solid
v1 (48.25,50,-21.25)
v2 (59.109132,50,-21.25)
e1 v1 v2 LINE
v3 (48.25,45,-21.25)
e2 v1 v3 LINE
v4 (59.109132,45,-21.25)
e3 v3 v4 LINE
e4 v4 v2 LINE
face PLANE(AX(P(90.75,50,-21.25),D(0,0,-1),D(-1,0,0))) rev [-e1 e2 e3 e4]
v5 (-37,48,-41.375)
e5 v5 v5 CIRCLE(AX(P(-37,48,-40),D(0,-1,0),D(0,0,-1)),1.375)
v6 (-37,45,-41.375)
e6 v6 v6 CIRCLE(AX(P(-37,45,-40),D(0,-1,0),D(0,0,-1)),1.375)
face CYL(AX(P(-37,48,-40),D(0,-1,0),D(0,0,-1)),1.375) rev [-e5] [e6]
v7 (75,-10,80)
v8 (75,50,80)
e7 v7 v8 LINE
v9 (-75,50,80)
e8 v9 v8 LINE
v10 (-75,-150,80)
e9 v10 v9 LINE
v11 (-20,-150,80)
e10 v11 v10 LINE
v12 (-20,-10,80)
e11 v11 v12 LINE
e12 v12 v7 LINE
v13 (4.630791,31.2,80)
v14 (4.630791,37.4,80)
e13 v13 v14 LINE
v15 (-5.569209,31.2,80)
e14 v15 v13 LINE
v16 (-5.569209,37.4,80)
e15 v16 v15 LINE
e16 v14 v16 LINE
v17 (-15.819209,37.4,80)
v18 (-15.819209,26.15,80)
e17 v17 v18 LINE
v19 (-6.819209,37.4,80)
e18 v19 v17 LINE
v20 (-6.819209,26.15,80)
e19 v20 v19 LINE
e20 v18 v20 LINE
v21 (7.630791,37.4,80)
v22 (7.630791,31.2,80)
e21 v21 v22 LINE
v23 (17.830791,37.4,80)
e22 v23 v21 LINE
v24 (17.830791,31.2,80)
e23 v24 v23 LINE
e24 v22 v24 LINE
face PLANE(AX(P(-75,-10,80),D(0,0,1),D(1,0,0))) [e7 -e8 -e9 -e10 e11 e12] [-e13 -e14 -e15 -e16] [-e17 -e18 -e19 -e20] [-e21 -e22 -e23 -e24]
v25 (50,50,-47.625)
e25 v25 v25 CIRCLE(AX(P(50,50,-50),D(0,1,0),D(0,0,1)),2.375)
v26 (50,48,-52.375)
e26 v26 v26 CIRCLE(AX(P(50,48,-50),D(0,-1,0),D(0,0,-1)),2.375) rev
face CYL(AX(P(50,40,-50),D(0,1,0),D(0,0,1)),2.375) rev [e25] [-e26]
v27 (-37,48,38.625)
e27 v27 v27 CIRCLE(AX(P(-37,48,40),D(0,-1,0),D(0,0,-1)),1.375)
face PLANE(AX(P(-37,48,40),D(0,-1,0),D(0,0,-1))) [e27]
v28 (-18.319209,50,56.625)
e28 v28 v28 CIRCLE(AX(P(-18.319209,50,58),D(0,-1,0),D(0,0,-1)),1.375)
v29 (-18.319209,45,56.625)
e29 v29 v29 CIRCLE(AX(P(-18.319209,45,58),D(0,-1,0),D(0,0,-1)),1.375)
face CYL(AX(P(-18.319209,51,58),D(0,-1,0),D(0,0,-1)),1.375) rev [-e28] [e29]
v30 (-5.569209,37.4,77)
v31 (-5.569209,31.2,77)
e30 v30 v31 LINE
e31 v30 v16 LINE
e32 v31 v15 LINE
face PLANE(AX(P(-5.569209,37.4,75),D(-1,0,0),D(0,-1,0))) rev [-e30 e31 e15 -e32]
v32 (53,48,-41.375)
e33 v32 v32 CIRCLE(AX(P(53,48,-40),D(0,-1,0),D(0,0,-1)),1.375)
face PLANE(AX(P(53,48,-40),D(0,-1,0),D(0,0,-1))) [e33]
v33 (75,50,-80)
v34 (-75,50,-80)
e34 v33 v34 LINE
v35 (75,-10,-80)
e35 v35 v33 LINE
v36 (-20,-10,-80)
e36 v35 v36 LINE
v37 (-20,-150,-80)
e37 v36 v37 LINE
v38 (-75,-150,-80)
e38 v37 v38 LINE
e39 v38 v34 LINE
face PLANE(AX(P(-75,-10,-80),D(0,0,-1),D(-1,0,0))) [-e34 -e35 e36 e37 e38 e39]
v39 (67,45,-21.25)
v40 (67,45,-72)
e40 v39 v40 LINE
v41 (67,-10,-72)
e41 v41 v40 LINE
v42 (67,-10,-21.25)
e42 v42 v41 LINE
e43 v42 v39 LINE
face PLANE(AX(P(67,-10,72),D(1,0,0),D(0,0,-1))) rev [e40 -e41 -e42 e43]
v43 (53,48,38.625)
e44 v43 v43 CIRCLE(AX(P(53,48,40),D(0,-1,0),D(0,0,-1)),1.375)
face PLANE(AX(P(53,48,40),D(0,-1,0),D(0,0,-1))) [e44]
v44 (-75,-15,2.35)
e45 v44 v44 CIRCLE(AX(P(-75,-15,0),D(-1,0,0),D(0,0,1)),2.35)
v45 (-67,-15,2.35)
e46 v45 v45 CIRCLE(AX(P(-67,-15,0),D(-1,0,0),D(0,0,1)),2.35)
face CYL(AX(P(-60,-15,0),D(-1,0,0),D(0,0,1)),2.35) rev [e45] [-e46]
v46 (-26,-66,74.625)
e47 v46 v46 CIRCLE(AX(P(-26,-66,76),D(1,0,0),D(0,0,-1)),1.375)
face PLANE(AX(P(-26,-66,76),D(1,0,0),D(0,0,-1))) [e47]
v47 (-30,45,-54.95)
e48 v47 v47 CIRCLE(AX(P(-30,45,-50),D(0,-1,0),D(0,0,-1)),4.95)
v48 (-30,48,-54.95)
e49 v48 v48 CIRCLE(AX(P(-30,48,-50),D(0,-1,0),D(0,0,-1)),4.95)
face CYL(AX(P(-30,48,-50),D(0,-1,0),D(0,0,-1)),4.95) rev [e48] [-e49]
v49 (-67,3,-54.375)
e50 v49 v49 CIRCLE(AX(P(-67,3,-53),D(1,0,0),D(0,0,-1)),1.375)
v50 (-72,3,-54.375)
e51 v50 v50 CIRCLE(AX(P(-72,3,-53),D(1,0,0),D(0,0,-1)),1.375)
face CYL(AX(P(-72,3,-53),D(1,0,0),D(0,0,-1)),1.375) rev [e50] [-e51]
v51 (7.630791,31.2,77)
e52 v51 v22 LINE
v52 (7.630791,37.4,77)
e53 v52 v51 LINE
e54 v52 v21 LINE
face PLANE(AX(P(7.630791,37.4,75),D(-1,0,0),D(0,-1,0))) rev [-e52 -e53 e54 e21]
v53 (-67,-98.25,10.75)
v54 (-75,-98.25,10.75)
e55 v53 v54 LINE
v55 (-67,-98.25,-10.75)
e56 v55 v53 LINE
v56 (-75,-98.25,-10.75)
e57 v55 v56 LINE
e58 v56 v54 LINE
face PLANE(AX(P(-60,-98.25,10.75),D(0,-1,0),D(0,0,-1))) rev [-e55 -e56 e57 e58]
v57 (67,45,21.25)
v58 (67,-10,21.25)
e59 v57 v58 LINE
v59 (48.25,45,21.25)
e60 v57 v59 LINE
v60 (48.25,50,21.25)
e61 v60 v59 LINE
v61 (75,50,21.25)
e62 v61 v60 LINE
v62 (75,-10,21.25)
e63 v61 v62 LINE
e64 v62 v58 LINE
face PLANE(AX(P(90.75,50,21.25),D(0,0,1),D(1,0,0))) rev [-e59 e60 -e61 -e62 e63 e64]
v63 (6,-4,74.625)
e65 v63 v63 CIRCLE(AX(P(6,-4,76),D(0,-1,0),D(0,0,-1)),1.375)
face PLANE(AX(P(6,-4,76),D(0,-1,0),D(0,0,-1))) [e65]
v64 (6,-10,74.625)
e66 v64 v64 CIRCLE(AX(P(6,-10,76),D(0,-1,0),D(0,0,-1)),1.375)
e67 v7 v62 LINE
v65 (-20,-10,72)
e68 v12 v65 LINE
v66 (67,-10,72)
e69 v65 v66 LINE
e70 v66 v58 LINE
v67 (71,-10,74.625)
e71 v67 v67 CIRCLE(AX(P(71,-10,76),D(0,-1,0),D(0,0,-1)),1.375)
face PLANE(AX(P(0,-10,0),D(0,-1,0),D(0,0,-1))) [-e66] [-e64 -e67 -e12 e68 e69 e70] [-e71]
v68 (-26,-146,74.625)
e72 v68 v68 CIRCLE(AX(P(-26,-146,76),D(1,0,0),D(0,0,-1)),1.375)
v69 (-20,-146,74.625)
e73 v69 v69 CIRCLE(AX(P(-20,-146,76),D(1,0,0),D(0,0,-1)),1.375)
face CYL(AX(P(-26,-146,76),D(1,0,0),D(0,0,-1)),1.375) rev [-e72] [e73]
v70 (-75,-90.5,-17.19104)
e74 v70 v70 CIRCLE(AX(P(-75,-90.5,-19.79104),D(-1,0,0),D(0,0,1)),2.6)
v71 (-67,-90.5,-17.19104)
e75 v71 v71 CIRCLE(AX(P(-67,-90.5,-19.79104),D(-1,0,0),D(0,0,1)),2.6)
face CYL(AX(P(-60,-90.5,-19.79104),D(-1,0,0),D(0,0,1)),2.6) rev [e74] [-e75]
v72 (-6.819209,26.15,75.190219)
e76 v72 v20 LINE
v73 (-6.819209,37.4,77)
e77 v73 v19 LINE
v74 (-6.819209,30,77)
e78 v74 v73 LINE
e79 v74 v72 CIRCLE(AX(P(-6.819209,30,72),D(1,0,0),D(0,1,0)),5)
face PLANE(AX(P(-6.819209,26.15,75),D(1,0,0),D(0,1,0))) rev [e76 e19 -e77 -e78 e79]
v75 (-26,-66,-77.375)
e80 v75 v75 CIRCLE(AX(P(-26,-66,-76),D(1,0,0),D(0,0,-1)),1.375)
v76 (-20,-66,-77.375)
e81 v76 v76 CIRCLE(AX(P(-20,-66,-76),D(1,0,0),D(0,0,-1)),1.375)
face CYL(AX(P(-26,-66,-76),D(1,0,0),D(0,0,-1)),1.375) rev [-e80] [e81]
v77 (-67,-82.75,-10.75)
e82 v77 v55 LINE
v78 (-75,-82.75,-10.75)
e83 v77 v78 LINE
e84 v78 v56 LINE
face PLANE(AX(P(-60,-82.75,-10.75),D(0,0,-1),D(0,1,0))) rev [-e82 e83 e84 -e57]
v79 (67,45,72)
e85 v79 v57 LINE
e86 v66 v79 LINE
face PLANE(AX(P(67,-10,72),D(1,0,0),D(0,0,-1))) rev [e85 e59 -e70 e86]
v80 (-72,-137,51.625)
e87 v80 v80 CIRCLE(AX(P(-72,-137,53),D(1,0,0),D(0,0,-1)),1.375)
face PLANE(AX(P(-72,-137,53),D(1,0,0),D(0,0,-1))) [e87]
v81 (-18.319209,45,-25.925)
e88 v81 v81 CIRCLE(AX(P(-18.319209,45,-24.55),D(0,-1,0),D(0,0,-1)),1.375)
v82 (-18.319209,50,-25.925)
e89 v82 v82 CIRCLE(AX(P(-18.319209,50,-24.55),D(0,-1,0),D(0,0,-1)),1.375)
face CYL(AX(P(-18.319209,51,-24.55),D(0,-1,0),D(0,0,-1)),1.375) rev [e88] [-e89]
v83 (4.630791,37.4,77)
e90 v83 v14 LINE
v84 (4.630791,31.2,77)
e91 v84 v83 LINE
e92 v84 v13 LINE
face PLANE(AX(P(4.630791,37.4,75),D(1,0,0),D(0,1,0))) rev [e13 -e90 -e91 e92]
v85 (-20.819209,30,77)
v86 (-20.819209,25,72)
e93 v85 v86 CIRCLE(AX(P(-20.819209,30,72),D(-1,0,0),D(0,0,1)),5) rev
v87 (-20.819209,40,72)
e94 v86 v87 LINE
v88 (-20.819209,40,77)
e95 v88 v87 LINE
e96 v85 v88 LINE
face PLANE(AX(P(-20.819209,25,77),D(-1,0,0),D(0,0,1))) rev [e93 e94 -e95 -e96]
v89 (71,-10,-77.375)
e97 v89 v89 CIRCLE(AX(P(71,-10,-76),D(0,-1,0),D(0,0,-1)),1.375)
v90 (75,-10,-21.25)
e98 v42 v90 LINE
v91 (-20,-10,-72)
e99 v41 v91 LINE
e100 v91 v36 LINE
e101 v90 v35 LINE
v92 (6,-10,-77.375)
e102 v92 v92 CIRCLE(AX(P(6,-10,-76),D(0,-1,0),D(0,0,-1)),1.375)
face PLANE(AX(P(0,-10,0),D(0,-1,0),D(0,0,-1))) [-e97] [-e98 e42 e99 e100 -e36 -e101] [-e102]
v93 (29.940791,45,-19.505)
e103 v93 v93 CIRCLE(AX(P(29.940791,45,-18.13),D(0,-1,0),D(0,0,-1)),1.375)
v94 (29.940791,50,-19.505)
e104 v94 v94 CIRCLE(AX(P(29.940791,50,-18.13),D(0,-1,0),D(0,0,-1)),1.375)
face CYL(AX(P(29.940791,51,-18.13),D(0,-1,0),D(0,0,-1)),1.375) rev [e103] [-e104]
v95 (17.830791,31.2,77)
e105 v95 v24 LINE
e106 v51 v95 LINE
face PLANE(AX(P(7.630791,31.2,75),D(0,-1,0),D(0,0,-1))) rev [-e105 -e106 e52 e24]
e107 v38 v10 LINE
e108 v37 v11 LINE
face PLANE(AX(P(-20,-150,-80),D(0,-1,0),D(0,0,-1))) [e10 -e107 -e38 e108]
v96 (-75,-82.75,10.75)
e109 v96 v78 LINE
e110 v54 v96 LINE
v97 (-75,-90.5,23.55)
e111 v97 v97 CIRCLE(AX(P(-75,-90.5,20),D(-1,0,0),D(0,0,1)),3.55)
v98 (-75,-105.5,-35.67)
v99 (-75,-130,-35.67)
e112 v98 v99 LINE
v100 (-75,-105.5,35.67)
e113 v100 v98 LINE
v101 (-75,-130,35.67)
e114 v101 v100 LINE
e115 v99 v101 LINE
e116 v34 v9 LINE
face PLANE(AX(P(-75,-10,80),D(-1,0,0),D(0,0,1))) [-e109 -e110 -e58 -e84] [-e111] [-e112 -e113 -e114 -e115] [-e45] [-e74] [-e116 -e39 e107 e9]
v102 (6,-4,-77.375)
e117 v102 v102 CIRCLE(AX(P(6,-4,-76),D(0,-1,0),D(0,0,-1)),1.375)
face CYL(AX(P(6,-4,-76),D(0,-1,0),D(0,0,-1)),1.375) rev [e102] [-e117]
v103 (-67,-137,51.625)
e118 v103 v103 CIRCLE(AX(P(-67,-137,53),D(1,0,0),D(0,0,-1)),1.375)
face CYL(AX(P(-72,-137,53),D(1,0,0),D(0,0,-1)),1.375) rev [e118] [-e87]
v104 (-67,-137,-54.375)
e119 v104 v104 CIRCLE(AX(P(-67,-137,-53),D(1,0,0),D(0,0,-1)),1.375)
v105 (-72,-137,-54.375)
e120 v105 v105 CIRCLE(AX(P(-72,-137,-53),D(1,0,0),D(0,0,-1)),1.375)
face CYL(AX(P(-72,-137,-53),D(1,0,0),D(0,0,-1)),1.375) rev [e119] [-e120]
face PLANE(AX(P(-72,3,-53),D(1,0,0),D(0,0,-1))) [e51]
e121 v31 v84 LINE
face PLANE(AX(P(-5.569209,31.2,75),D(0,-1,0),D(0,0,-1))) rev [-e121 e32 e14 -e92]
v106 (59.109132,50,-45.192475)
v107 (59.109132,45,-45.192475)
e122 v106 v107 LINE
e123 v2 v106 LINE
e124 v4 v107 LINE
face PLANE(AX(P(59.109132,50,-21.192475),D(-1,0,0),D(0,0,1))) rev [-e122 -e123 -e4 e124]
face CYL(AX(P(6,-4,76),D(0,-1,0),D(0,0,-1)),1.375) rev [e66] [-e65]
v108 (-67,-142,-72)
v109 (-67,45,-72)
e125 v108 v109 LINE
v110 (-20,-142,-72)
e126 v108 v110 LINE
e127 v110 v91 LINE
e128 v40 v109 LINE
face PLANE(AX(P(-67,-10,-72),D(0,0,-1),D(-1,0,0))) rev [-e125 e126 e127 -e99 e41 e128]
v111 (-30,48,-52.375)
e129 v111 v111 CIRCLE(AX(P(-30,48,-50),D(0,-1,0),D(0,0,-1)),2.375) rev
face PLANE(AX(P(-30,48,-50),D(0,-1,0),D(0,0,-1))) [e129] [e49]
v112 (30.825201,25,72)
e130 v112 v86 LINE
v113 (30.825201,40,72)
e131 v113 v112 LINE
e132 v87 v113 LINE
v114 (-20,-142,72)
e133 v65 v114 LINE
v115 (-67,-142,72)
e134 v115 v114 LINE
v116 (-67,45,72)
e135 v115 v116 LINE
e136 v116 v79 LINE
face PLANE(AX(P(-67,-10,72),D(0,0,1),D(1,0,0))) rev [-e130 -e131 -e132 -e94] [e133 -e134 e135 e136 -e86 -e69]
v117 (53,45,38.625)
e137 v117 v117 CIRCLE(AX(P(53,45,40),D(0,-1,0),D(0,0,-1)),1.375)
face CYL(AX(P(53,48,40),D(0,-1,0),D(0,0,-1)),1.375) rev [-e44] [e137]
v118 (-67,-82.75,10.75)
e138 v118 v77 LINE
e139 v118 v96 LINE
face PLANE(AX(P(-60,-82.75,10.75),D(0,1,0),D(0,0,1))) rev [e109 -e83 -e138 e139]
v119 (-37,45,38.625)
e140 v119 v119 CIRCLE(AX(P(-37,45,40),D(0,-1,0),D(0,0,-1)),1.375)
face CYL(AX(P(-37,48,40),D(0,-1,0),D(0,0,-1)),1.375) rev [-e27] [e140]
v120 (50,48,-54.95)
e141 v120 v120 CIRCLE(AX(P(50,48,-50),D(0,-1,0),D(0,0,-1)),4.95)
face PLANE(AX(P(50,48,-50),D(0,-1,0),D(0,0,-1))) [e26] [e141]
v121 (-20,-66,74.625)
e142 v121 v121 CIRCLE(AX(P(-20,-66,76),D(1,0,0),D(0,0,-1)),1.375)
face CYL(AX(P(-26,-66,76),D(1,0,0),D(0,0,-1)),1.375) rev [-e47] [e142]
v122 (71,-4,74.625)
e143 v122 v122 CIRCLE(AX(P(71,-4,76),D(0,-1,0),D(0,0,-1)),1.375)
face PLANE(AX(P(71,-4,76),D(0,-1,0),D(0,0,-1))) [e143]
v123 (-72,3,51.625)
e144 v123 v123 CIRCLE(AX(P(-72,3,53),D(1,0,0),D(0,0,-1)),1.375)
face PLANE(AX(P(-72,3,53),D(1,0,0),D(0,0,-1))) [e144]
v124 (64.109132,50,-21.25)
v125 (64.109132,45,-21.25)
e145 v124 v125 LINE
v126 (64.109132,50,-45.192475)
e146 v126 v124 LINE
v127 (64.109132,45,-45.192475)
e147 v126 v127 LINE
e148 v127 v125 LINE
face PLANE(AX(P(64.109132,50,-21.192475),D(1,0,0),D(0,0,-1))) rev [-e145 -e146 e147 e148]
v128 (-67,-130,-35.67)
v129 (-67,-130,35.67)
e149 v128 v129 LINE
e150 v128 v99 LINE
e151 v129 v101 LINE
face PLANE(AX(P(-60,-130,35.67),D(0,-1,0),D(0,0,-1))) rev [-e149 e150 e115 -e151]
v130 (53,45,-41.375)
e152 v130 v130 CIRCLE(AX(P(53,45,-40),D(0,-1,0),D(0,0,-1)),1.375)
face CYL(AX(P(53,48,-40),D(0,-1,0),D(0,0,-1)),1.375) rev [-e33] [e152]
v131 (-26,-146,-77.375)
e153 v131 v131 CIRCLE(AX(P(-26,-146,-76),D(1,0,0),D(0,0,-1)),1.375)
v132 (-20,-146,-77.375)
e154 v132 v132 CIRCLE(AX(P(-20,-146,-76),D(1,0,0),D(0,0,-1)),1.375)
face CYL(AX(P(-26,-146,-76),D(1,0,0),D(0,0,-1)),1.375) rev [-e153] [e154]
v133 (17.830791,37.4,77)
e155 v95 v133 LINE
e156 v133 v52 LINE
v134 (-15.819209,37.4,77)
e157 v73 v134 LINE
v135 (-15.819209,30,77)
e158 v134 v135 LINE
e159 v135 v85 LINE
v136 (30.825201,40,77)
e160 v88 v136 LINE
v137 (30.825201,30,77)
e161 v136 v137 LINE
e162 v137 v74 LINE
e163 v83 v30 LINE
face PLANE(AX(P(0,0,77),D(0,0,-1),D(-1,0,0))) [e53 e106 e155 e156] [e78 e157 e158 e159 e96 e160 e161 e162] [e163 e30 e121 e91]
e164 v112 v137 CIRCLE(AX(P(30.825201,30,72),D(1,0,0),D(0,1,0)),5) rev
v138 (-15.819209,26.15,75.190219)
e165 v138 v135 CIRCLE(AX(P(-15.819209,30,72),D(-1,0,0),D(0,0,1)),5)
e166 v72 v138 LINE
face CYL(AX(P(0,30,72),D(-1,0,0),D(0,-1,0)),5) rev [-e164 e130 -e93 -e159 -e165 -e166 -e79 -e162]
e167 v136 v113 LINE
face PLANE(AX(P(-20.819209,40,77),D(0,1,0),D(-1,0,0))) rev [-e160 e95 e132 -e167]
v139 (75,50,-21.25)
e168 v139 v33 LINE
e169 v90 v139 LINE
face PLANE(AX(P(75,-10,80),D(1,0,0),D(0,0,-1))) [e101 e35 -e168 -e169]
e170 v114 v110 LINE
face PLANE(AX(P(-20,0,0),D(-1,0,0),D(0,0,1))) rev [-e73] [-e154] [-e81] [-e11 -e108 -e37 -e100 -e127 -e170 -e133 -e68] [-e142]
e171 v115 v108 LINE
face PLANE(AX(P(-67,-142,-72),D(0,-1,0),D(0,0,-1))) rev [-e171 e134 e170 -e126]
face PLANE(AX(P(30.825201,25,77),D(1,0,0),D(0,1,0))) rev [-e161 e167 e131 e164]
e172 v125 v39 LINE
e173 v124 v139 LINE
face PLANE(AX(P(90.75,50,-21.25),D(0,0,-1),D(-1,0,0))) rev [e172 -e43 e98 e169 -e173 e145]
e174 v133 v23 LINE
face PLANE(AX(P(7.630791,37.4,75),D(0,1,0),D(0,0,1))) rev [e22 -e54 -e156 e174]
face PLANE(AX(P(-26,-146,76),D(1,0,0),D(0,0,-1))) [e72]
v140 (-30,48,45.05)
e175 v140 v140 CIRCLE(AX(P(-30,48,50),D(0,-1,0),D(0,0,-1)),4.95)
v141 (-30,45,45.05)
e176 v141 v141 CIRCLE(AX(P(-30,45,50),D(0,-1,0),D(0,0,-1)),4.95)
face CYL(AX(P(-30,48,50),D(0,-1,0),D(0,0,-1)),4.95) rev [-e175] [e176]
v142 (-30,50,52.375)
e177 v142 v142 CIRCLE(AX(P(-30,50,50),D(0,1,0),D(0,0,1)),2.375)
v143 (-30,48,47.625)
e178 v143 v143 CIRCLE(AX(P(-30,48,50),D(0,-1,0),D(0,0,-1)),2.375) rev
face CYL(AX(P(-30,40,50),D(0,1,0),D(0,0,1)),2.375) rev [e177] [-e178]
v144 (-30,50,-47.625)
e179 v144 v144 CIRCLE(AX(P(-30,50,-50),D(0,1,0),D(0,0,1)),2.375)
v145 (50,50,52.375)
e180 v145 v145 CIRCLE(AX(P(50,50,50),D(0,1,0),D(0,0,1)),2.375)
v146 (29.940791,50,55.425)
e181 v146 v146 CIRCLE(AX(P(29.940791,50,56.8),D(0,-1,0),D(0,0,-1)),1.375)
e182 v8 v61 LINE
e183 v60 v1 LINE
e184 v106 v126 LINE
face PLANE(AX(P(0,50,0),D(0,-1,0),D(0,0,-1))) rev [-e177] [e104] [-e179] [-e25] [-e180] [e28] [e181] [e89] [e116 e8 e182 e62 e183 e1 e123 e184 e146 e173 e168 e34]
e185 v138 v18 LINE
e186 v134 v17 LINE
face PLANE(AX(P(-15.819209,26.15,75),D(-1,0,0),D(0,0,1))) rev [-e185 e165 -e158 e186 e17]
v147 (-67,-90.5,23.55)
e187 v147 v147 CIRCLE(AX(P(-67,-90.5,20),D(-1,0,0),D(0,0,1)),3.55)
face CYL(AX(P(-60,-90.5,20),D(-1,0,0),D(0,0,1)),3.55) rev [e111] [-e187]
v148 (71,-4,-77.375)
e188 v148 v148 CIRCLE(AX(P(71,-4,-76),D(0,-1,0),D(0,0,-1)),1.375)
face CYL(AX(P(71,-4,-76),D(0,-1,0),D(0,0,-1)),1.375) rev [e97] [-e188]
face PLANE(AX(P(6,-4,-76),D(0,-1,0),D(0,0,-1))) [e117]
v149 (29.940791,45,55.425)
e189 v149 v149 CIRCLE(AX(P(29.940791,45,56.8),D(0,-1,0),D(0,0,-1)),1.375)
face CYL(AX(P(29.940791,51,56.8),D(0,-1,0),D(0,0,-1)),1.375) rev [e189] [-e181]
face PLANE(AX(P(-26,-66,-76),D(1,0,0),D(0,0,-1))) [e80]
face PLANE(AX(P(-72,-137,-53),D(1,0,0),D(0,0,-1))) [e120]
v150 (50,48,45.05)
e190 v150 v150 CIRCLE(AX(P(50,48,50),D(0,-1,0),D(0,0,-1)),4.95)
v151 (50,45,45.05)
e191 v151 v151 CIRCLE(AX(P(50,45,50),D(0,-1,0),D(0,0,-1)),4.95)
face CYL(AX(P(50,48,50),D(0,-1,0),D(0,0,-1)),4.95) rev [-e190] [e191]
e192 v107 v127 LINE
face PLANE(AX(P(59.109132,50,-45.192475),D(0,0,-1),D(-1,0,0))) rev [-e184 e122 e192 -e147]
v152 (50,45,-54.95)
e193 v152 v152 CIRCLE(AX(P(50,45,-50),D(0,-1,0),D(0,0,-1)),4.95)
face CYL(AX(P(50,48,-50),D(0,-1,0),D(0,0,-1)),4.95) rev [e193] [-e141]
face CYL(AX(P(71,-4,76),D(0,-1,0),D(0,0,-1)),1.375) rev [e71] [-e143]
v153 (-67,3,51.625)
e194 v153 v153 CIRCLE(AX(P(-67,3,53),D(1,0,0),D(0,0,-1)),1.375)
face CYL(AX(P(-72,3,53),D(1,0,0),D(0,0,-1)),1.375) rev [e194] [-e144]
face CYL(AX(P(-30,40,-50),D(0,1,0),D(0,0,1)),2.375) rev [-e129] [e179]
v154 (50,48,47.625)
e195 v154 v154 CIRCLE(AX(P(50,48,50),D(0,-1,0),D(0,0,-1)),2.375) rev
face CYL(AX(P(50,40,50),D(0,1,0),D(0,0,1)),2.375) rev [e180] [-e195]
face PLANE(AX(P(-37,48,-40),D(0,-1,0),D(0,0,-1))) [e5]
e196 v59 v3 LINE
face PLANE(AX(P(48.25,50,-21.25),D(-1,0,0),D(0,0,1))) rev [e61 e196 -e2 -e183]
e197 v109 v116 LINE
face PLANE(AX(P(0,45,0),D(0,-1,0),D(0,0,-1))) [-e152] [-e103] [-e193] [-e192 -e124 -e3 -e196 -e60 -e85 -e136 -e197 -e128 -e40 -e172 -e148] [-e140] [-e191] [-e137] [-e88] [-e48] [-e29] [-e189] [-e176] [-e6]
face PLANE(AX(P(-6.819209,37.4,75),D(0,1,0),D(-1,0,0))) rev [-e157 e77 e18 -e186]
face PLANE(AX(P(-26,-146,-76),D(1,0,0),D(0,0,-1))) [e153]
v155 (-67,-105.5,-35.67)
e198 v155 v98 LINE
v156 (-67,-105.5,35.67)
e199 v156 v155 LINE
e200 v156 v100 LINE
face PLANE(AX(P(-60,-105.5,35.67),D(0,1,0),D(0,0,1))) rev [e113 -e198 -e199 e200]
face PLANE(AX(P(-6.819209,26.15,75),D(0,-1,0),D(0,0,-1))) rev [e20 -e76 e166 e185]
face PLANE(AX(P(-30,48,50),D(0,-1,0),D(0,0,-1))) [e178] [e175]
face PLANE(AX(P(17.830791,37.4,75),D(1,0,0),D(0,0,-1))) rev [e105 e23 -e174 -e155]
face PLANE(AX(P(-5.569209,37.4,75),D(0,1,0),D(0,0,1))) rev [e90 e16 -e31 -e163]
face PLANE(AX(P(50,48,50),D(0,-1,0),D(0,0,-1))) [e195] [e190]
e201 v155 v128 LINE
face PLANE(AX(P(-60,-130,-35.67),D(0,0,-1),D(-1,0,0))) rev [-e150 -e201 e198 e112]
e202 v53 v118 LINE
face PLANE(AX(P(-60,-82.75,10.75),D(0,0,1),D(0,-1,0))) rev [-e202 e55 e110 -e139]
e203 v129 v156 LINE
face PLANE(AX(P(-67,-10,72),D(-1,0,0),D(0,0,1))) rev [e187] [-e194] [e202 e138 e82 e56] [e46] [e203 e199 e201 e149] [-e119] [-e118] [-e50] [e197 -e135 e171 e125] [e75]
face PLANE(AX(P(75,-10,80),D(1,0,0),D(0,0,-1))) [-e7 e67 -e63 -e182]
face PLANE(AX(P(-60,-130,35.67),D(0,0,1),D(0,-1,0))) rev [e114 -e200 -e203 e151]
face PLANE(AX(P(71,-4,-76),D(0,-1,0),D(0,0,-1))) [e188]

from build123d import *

# Parameters (mm, degrees)
BOSS_EXTRUDE1_DEPTH      = 50
BOSS_EXTRUDE1_DEPTH_BACK = 10
SKETCH1_W                = 150
SKETCH1_H                = 160
CUT_EXTRUDE1_DEPTH       = 45
CUT_EXTRUDE1_DEPTH_BACK  = 10
SKETCH3_W                = 134
SKETCH3_H                = 144
SKETCH4_W                = 160
SKETCH4_H                = 140
BOSS_EXTRUDE2_DEPTH      = 55
SKETCH7_W                = 144
SKETCH7_H                = 132
CUT_EXTRUDE3_DEPTH       = 47
SKETCH12_R               = 1.375
CUT_EXTRUDE4_DEPTH       = 6
SKETCH13_R               = 1.375
CUT_EXTRUDE5_DEPTH       = 6
SKETCH16_R               = 1.375
CUT_EXTRUDE6_DEPTH       = 6
SKETCH17_W               = 9
SKETCH17_H               = 11.25
SKETCH17_W_2             = 10.2
SKETCH17_H_2             = 6.2
CUT_EXTRUDE7_DEPTH       = 5
SKETCH18_R               = 3.55
SKETCH18_R_2             = 2.6
SKETCH18_R_3             = 2.35
SKETCH18_W               = 71.34
SKETCH18_H               = 24.5
SKETCH18_W_2             = 21.5
SKETCH18_H_2             = 15.5
CUT_EXTRUDE8_DEPTH       = 15
SKETCH20_W               = 51.644409869
SKETCH20_H               = 15
CUT_EXTRUDE9_DEPTH       = 5
FILLET3_R                = 5
SKETCH21_R               = 2.375
CUT_EXTRUDE10_DEPTH      = 10
SKETCH22_R               = 4.95
SKETCH22_R_2             = 1.375
CUT_EXTRUDE11_DEPTH      = 3
SKETCH23_R               = 1.375
CUT_EXTRUDE12_DEPTH      = 5
SKETCH25_W               = 42.5
SKETCH25_H               = 42.5
CUT_EXTRUDE13_DEPTH      = 60
SKETCH26_W               = 5
SKETCH26_H               = 24
CUT_EXTRUDE14_DEPTH      = 5


with BuildPart() as part:
    # Sketch1 → Boss-Extrude1 (new, two sides: drawn at the far end of the back side and taken through both)
    with BuildSketch(Plane(origin=(0, 0, 0), x_dir=(1, 0, 0), z_dir=(0, 1, 0)).offset(-BOSS_EXTRUDE1_DEPTH_BACK)):
        Rectangle(SKETCH1_W, SKETCH1_H)
    extrude(amount=BOSS_EXTRUDE1_DEPTH + BOSS_EXTRUDE1_DEPTH_BACK)

    # Sketch3 → Cut-Extrude1 (cut, two sides: drawn at the far end of the back side and taken through both)
    with BuildSketch(Plane(origin=(0, 0, 0), x_dir=(1, 0, 0), z_dir=(0, 1, 0)).offset(-CUT_EXTRUDE1_DEPTH_BACK)):
        Rectangle(SKETCH3_W, SKETCH3_H)
    extrude(amount=CUT_EXTRUDE1_DEPTH + CUT_EXTRUDE1_DEPTH_BACK, mode=Mode.SUBTRACT)

    # Sketch4 → Boss-Extrude2 (add)
    with BuildSketch(Plane.ZY.offset(75)):
        with Locations((0, -80)):
            Rectangle(SKETCH4_W, SKETCH4_H)
    extrude(amount=-BOSS_EXTRUDE2_DEPTH)

    # Sketch7 → Cut-Extrude3 (cut)
    with BuildSketch(Plane(origin=(-20, 0, 0), x_dir=(0, 0, -1), z_dir=(1, 0, 0))):
        with Locations((0, -76)):
            Rectangle(SKETCH7_W, SKETCH7_H)
    extrude(amount=-CUT_EXTRUDE3_DEPTH, mode=Mode.SUBTRACT)

    # Sketch12 → Cut-Extrude4 (cut)
    with BuildSketch(Plane(origin=(-20, 0, 0), x_dir=(0, 0, -1), z_dir=(1, 0, 0))):
        with Locations((-76, -146)):
            Circle(SKETCH12_R)
        with Locations((76, -146)):
            Circle(SKETCH12_R)
        with Locations((76, -66)):
            Circle(SKETCH12_R)
        with Locations((-76, -66)):
            Circle(SKETCH12_R)
    extrude(amount=-CUT_EXTRUDE4_DEPTH, mode=Mode.SUBTRACT)

    # Sketch13 → Cut-Extrude5 (cut)
    with BuildSketch(Plane(origin=(0, -10, 0), x_dir=(-1, 0, 0), z_dir=(0, -1, 0))):
        with Locations(Location((-71, 76, 0), (0, 0, 90))):
            Circle(SKETCH13_R)
        with Locations(Location((-6, 76, 0), (0, 0, 90))):
            Circle(SKETCH13_R)
        with Locations(Location((-6, -76, 0), (0, 0, 90))):
            Circle(SKETCH13_R)
        with Locations(Location((-71, -76, 0), (0, 0, 90))):
            Circle(SKETCH13_R)
    extrude(amount=-CUT_EXTRUDE5_DEPTH, mode=Mode.SUBTRACT)

    # Sketch16 → Cut-Extrude6 (cut)
    with BuildSketch(Plane(origin=(0, 45, 0), x_dir=(-1, 0, 0), z_dir=(0, -1, 0))):
        with Locations(Location((18.319208848, -58, 0), (0, 0, 90))):
            Circle(SKETCH16_R)
        with Locations(Location((18.319208848, 24.55, 0), (0, 0, 90))):
            Circle(SKETCH16_R)
        with Locations(Location((-29.940791152, -56.8, 0), (0, 0, 90))):
            Circle(SKETCH16_R)
        with Locations(Location((-29.940791152, 18.13, 0), (0, 0, 90))):
            Circle(SKETCH16_R)
    extrude(amount=-CUT_EXTRUDE6_DEPTH, mode=Mode.SUBTRACT)

    # Sketch17 → Cut-Extrude7 (cut)
    with BuildSketch(Plane.XY.offset(80)):
        with Locations((-11.319208848, 31.775)):
            Rectangle(SKETCH17_W, SKETCH17_H)
        with Locations((12.730791152, 34.3)):
            Rectangle(SKETCH17_W_2, SKETCH17_H_2)
        with Locations((-0.469208848, 34.3)):
            Rectangle(SKETCH17_W_2, SKETCH17_H_2)
    extrude(amount=-CUT_EXTRUDE7_DEPTH, mode=Mode.SUBTRACT)

    # Sketch18 → Cut-Extrude8 (cut)
    with BuildSketch(Plane.ZY.offset(75)):
        with Locations((20, -90.5)):
            Circle(SKETCH18_R)
        with Locations((-19.79104036, -90.5)):
            Circle(SKETCH18_R_2)
        with Locations((0, -15)):
            Circle(SKETCH18_R_3)
        with Locations((0, -117.75)):
            Rectangle(SKETCH18_W, SKETCH18_H)
        with Locations((0, -90.5)):
            Rectangle(SKETCH18_W_2, SKETCH18_H_2)
    extrude(amount=-CUT_EXTRUDE8_DEPTH, mode=Mode.SUBTRACT)

    # Sketch20 → Cut-Extrude9 (cut)
    with BuildSketch(Plane(origin=(0, 0, 72), x_dir=(-1, 0, 0), z_dir=(0, 0, -1))):
        with Locations((-5.002996086, 32.5)):
            Rectangle(SKETCH20_W, SKETCH20_H)
    extrude(amount=-CUT_EXTRUDE9_DEPTH, mode=Mode.SUBTRACT)

    # Fillet3
    # the kernel refuses this fillet: 5 mm, written as the material it adds along each edge
    with BuildSketch(Plane(origin=(-33.319208848, 25, 77), x_dir=(0, 1, 0), z_dir=(1, 0, 0))) as fillet3_piece_1_section:
        with BuildLine():
            CenterArc((FILLET3_R, -FILLET3_R), FILLET3_R, 90, 90)
            Line((0, -FILLET3_R), (0, 0))
            Line((0, 0), (FILLET3_R, 0))
        make_face()
    fillet3_piece_1 = extrude(amount=76.644409869, mode=Mode.PRIVATE)
    fillet3_piece_1 = split(fillet3_piece_1, bisect_by=Plane(origin=(-15.819208848, 27.074193892, 76.479369386), z_dir=(-1, 0, 0)), keep=Keep.TOP, mode=Mode.PRIVATE)
    add(fillet3_piece_1)
    with BuildSketch(Plane(origin=(-33.319208848, 25, 77), x_dir=(0, 1, 0), z_dir=(1, 0, 0))) as fillet3_piece_2_section:
        with BuildLine():
            CenterArc((FILLET3_R, -FILLET3_R), FILLET3_R, 90, 90)
            Line((0, -FILLET3_R), (0, 0))
            Line((0, 0), (FILLET3_R, 0))
        make_face()
    fillet3_piece_2 = extrude(amount=76.644409869, mode=Mode.PRIVATE)
    fillet3_piece_2 = split(fillet3_piece_2, bisect_by=Plane(origin=(-11.319208848, 26.15, 75.492647352), z_dir=(0, -1, 0)), keep=Keep.TOP, mode=Mode.PRIVATE)
    add(fillet3_piece_2)
    with BuildSketch(Plane(origin=(-33.319208848, 25, 77), x_dir=(0, 1, 0), z_dir=(1, 0, 0))) as fillet3_piece_3_section:
        with BuildLine():
            CenterArc((FILLET3_R, -FILLET3_R), FILLET3_R, 90, 90)
            Line((0, -FILLET3_R), (0, 0))
            Line((0, 0), (FILLET3_R, 0))
        make_face()
    fillet3_piece_3 = extrude(amount=76.644409869, mode=Mode.PRIVATE)
    fillet3_piece_3 = split(fillet3_piece_3, bisect_by=Plane(origin=(-6.819208848, 27.074193892, 76.479369386), z_dir=(1, 0, 0)), keep=Keep.TOP, mode=Mode.PRIVATE)
    add(fillet3_piece_3)

    # Sketch21 → Cut-Extrude10 (cut)
    with BuildSketch(Plane(origin=(0, 50, 0), x_dir=(1, 0, 0), z_dir=(0, 1, 0))):
        with Locations(Location((50, 50, 0), (0, 0, 270))):
            Circle(SKETCH21_R)
        with Locations(Location((-30, 50, 0), (0, 0, 270))):
            Circle(SKETCH21_R)
        with Locations(Location((-30, -50, 0), (0, 0, 270))):
            Circle(SKETCH21_R)
        with Locations(Location((50, -50, 0), (0, 0, 270))):
            Circle(SKETCH21_R)
    extrude(amount=-CUT_EXTRUDE10_DEPTH, mode=Mode.SUBTRACT)

    # Sketch22 → Cut-Extrude11 (cut)
    with BuildSketch(Plane.XZ.offset(-45)):
        with Locations(Location((-30, 50, 0), (0, 0, 270))):
            Circle(SKETCH22_R)
        with Locations(Location((50, 50, 0), (0, 0, 270))):
            Circle(SKETCH22_R)
        with Locations(Location((50, -50, 0), (0, 0, 270))):
            Circle(SKETCH22_R)
        with Locations(Location((-30, -50, 0), (0, 0, 270))):
            Circle(SKETCH22_R)
        with Locations(Location((-37, 40, 0), (0, 0, 270))):
            Circle(SKETCH22_R_2)
        with Locations(Location((53, 40, 0), (0, 0, 270))):
            Circle(SKETCH22_R_2)
        with Locations(Location((53, -40, 0), (0, 0, 270))):
            Circle(SKETCH22_R_2)
        with Locations(Location((-37, -40, 0), (0, 0, 270))):
            Circle(SKETCH22_R_2)
    extrude(amount=-CUT_EXTRUDE11_DEPTH, mode=Mode.SUBTRACT)

    # Sketch23 → Cut-Extrude12 (cut)
    with BuildSketch(Plane(origin=(-67, 0, 0), x_dir=(0, 0, -1), z_dir=(1, 0, 0))):
        with Locations((53, -137)):
            Circle(SKETCH23_R)
        with Locations((-53, -137)):
            Circle(SKETCH23_R)
        with Locations((-53, 3)):
            Circle(SKETCH23_R)
        with Locations((53, 3)):
            Circle(SKETCH23_R)
    extrude(amount=-CUT_EXTRUDE12_DEPTH, mode=Mode.SUBTRACT)

    # Sketch25 → Cut-Extrude13 (cut)
    with BuildSketch(Plane.XZ.offset(10)):
        with Locations((69.5, 0)):
            Rectangle(SKETCH25_W, SKETCH25_H)
    extrude(amount=-CUT_EXTRUDE13_DEPTH, mode=Mode.SUBTRACT)

    # Sketch26 → Cut-Extrude14 (cut)
    with BuildSketch(Plane.XZ.offset(-45)):
        with Locations((61.60913212, -33.192475412)):
            Rectangle(SKETCH26_W, SKETCH26_H)
    extrude(amount=-CUT_EXTRUDE14_DEPTH, mode=Mode.SUBTRACT)


solid = part.part
